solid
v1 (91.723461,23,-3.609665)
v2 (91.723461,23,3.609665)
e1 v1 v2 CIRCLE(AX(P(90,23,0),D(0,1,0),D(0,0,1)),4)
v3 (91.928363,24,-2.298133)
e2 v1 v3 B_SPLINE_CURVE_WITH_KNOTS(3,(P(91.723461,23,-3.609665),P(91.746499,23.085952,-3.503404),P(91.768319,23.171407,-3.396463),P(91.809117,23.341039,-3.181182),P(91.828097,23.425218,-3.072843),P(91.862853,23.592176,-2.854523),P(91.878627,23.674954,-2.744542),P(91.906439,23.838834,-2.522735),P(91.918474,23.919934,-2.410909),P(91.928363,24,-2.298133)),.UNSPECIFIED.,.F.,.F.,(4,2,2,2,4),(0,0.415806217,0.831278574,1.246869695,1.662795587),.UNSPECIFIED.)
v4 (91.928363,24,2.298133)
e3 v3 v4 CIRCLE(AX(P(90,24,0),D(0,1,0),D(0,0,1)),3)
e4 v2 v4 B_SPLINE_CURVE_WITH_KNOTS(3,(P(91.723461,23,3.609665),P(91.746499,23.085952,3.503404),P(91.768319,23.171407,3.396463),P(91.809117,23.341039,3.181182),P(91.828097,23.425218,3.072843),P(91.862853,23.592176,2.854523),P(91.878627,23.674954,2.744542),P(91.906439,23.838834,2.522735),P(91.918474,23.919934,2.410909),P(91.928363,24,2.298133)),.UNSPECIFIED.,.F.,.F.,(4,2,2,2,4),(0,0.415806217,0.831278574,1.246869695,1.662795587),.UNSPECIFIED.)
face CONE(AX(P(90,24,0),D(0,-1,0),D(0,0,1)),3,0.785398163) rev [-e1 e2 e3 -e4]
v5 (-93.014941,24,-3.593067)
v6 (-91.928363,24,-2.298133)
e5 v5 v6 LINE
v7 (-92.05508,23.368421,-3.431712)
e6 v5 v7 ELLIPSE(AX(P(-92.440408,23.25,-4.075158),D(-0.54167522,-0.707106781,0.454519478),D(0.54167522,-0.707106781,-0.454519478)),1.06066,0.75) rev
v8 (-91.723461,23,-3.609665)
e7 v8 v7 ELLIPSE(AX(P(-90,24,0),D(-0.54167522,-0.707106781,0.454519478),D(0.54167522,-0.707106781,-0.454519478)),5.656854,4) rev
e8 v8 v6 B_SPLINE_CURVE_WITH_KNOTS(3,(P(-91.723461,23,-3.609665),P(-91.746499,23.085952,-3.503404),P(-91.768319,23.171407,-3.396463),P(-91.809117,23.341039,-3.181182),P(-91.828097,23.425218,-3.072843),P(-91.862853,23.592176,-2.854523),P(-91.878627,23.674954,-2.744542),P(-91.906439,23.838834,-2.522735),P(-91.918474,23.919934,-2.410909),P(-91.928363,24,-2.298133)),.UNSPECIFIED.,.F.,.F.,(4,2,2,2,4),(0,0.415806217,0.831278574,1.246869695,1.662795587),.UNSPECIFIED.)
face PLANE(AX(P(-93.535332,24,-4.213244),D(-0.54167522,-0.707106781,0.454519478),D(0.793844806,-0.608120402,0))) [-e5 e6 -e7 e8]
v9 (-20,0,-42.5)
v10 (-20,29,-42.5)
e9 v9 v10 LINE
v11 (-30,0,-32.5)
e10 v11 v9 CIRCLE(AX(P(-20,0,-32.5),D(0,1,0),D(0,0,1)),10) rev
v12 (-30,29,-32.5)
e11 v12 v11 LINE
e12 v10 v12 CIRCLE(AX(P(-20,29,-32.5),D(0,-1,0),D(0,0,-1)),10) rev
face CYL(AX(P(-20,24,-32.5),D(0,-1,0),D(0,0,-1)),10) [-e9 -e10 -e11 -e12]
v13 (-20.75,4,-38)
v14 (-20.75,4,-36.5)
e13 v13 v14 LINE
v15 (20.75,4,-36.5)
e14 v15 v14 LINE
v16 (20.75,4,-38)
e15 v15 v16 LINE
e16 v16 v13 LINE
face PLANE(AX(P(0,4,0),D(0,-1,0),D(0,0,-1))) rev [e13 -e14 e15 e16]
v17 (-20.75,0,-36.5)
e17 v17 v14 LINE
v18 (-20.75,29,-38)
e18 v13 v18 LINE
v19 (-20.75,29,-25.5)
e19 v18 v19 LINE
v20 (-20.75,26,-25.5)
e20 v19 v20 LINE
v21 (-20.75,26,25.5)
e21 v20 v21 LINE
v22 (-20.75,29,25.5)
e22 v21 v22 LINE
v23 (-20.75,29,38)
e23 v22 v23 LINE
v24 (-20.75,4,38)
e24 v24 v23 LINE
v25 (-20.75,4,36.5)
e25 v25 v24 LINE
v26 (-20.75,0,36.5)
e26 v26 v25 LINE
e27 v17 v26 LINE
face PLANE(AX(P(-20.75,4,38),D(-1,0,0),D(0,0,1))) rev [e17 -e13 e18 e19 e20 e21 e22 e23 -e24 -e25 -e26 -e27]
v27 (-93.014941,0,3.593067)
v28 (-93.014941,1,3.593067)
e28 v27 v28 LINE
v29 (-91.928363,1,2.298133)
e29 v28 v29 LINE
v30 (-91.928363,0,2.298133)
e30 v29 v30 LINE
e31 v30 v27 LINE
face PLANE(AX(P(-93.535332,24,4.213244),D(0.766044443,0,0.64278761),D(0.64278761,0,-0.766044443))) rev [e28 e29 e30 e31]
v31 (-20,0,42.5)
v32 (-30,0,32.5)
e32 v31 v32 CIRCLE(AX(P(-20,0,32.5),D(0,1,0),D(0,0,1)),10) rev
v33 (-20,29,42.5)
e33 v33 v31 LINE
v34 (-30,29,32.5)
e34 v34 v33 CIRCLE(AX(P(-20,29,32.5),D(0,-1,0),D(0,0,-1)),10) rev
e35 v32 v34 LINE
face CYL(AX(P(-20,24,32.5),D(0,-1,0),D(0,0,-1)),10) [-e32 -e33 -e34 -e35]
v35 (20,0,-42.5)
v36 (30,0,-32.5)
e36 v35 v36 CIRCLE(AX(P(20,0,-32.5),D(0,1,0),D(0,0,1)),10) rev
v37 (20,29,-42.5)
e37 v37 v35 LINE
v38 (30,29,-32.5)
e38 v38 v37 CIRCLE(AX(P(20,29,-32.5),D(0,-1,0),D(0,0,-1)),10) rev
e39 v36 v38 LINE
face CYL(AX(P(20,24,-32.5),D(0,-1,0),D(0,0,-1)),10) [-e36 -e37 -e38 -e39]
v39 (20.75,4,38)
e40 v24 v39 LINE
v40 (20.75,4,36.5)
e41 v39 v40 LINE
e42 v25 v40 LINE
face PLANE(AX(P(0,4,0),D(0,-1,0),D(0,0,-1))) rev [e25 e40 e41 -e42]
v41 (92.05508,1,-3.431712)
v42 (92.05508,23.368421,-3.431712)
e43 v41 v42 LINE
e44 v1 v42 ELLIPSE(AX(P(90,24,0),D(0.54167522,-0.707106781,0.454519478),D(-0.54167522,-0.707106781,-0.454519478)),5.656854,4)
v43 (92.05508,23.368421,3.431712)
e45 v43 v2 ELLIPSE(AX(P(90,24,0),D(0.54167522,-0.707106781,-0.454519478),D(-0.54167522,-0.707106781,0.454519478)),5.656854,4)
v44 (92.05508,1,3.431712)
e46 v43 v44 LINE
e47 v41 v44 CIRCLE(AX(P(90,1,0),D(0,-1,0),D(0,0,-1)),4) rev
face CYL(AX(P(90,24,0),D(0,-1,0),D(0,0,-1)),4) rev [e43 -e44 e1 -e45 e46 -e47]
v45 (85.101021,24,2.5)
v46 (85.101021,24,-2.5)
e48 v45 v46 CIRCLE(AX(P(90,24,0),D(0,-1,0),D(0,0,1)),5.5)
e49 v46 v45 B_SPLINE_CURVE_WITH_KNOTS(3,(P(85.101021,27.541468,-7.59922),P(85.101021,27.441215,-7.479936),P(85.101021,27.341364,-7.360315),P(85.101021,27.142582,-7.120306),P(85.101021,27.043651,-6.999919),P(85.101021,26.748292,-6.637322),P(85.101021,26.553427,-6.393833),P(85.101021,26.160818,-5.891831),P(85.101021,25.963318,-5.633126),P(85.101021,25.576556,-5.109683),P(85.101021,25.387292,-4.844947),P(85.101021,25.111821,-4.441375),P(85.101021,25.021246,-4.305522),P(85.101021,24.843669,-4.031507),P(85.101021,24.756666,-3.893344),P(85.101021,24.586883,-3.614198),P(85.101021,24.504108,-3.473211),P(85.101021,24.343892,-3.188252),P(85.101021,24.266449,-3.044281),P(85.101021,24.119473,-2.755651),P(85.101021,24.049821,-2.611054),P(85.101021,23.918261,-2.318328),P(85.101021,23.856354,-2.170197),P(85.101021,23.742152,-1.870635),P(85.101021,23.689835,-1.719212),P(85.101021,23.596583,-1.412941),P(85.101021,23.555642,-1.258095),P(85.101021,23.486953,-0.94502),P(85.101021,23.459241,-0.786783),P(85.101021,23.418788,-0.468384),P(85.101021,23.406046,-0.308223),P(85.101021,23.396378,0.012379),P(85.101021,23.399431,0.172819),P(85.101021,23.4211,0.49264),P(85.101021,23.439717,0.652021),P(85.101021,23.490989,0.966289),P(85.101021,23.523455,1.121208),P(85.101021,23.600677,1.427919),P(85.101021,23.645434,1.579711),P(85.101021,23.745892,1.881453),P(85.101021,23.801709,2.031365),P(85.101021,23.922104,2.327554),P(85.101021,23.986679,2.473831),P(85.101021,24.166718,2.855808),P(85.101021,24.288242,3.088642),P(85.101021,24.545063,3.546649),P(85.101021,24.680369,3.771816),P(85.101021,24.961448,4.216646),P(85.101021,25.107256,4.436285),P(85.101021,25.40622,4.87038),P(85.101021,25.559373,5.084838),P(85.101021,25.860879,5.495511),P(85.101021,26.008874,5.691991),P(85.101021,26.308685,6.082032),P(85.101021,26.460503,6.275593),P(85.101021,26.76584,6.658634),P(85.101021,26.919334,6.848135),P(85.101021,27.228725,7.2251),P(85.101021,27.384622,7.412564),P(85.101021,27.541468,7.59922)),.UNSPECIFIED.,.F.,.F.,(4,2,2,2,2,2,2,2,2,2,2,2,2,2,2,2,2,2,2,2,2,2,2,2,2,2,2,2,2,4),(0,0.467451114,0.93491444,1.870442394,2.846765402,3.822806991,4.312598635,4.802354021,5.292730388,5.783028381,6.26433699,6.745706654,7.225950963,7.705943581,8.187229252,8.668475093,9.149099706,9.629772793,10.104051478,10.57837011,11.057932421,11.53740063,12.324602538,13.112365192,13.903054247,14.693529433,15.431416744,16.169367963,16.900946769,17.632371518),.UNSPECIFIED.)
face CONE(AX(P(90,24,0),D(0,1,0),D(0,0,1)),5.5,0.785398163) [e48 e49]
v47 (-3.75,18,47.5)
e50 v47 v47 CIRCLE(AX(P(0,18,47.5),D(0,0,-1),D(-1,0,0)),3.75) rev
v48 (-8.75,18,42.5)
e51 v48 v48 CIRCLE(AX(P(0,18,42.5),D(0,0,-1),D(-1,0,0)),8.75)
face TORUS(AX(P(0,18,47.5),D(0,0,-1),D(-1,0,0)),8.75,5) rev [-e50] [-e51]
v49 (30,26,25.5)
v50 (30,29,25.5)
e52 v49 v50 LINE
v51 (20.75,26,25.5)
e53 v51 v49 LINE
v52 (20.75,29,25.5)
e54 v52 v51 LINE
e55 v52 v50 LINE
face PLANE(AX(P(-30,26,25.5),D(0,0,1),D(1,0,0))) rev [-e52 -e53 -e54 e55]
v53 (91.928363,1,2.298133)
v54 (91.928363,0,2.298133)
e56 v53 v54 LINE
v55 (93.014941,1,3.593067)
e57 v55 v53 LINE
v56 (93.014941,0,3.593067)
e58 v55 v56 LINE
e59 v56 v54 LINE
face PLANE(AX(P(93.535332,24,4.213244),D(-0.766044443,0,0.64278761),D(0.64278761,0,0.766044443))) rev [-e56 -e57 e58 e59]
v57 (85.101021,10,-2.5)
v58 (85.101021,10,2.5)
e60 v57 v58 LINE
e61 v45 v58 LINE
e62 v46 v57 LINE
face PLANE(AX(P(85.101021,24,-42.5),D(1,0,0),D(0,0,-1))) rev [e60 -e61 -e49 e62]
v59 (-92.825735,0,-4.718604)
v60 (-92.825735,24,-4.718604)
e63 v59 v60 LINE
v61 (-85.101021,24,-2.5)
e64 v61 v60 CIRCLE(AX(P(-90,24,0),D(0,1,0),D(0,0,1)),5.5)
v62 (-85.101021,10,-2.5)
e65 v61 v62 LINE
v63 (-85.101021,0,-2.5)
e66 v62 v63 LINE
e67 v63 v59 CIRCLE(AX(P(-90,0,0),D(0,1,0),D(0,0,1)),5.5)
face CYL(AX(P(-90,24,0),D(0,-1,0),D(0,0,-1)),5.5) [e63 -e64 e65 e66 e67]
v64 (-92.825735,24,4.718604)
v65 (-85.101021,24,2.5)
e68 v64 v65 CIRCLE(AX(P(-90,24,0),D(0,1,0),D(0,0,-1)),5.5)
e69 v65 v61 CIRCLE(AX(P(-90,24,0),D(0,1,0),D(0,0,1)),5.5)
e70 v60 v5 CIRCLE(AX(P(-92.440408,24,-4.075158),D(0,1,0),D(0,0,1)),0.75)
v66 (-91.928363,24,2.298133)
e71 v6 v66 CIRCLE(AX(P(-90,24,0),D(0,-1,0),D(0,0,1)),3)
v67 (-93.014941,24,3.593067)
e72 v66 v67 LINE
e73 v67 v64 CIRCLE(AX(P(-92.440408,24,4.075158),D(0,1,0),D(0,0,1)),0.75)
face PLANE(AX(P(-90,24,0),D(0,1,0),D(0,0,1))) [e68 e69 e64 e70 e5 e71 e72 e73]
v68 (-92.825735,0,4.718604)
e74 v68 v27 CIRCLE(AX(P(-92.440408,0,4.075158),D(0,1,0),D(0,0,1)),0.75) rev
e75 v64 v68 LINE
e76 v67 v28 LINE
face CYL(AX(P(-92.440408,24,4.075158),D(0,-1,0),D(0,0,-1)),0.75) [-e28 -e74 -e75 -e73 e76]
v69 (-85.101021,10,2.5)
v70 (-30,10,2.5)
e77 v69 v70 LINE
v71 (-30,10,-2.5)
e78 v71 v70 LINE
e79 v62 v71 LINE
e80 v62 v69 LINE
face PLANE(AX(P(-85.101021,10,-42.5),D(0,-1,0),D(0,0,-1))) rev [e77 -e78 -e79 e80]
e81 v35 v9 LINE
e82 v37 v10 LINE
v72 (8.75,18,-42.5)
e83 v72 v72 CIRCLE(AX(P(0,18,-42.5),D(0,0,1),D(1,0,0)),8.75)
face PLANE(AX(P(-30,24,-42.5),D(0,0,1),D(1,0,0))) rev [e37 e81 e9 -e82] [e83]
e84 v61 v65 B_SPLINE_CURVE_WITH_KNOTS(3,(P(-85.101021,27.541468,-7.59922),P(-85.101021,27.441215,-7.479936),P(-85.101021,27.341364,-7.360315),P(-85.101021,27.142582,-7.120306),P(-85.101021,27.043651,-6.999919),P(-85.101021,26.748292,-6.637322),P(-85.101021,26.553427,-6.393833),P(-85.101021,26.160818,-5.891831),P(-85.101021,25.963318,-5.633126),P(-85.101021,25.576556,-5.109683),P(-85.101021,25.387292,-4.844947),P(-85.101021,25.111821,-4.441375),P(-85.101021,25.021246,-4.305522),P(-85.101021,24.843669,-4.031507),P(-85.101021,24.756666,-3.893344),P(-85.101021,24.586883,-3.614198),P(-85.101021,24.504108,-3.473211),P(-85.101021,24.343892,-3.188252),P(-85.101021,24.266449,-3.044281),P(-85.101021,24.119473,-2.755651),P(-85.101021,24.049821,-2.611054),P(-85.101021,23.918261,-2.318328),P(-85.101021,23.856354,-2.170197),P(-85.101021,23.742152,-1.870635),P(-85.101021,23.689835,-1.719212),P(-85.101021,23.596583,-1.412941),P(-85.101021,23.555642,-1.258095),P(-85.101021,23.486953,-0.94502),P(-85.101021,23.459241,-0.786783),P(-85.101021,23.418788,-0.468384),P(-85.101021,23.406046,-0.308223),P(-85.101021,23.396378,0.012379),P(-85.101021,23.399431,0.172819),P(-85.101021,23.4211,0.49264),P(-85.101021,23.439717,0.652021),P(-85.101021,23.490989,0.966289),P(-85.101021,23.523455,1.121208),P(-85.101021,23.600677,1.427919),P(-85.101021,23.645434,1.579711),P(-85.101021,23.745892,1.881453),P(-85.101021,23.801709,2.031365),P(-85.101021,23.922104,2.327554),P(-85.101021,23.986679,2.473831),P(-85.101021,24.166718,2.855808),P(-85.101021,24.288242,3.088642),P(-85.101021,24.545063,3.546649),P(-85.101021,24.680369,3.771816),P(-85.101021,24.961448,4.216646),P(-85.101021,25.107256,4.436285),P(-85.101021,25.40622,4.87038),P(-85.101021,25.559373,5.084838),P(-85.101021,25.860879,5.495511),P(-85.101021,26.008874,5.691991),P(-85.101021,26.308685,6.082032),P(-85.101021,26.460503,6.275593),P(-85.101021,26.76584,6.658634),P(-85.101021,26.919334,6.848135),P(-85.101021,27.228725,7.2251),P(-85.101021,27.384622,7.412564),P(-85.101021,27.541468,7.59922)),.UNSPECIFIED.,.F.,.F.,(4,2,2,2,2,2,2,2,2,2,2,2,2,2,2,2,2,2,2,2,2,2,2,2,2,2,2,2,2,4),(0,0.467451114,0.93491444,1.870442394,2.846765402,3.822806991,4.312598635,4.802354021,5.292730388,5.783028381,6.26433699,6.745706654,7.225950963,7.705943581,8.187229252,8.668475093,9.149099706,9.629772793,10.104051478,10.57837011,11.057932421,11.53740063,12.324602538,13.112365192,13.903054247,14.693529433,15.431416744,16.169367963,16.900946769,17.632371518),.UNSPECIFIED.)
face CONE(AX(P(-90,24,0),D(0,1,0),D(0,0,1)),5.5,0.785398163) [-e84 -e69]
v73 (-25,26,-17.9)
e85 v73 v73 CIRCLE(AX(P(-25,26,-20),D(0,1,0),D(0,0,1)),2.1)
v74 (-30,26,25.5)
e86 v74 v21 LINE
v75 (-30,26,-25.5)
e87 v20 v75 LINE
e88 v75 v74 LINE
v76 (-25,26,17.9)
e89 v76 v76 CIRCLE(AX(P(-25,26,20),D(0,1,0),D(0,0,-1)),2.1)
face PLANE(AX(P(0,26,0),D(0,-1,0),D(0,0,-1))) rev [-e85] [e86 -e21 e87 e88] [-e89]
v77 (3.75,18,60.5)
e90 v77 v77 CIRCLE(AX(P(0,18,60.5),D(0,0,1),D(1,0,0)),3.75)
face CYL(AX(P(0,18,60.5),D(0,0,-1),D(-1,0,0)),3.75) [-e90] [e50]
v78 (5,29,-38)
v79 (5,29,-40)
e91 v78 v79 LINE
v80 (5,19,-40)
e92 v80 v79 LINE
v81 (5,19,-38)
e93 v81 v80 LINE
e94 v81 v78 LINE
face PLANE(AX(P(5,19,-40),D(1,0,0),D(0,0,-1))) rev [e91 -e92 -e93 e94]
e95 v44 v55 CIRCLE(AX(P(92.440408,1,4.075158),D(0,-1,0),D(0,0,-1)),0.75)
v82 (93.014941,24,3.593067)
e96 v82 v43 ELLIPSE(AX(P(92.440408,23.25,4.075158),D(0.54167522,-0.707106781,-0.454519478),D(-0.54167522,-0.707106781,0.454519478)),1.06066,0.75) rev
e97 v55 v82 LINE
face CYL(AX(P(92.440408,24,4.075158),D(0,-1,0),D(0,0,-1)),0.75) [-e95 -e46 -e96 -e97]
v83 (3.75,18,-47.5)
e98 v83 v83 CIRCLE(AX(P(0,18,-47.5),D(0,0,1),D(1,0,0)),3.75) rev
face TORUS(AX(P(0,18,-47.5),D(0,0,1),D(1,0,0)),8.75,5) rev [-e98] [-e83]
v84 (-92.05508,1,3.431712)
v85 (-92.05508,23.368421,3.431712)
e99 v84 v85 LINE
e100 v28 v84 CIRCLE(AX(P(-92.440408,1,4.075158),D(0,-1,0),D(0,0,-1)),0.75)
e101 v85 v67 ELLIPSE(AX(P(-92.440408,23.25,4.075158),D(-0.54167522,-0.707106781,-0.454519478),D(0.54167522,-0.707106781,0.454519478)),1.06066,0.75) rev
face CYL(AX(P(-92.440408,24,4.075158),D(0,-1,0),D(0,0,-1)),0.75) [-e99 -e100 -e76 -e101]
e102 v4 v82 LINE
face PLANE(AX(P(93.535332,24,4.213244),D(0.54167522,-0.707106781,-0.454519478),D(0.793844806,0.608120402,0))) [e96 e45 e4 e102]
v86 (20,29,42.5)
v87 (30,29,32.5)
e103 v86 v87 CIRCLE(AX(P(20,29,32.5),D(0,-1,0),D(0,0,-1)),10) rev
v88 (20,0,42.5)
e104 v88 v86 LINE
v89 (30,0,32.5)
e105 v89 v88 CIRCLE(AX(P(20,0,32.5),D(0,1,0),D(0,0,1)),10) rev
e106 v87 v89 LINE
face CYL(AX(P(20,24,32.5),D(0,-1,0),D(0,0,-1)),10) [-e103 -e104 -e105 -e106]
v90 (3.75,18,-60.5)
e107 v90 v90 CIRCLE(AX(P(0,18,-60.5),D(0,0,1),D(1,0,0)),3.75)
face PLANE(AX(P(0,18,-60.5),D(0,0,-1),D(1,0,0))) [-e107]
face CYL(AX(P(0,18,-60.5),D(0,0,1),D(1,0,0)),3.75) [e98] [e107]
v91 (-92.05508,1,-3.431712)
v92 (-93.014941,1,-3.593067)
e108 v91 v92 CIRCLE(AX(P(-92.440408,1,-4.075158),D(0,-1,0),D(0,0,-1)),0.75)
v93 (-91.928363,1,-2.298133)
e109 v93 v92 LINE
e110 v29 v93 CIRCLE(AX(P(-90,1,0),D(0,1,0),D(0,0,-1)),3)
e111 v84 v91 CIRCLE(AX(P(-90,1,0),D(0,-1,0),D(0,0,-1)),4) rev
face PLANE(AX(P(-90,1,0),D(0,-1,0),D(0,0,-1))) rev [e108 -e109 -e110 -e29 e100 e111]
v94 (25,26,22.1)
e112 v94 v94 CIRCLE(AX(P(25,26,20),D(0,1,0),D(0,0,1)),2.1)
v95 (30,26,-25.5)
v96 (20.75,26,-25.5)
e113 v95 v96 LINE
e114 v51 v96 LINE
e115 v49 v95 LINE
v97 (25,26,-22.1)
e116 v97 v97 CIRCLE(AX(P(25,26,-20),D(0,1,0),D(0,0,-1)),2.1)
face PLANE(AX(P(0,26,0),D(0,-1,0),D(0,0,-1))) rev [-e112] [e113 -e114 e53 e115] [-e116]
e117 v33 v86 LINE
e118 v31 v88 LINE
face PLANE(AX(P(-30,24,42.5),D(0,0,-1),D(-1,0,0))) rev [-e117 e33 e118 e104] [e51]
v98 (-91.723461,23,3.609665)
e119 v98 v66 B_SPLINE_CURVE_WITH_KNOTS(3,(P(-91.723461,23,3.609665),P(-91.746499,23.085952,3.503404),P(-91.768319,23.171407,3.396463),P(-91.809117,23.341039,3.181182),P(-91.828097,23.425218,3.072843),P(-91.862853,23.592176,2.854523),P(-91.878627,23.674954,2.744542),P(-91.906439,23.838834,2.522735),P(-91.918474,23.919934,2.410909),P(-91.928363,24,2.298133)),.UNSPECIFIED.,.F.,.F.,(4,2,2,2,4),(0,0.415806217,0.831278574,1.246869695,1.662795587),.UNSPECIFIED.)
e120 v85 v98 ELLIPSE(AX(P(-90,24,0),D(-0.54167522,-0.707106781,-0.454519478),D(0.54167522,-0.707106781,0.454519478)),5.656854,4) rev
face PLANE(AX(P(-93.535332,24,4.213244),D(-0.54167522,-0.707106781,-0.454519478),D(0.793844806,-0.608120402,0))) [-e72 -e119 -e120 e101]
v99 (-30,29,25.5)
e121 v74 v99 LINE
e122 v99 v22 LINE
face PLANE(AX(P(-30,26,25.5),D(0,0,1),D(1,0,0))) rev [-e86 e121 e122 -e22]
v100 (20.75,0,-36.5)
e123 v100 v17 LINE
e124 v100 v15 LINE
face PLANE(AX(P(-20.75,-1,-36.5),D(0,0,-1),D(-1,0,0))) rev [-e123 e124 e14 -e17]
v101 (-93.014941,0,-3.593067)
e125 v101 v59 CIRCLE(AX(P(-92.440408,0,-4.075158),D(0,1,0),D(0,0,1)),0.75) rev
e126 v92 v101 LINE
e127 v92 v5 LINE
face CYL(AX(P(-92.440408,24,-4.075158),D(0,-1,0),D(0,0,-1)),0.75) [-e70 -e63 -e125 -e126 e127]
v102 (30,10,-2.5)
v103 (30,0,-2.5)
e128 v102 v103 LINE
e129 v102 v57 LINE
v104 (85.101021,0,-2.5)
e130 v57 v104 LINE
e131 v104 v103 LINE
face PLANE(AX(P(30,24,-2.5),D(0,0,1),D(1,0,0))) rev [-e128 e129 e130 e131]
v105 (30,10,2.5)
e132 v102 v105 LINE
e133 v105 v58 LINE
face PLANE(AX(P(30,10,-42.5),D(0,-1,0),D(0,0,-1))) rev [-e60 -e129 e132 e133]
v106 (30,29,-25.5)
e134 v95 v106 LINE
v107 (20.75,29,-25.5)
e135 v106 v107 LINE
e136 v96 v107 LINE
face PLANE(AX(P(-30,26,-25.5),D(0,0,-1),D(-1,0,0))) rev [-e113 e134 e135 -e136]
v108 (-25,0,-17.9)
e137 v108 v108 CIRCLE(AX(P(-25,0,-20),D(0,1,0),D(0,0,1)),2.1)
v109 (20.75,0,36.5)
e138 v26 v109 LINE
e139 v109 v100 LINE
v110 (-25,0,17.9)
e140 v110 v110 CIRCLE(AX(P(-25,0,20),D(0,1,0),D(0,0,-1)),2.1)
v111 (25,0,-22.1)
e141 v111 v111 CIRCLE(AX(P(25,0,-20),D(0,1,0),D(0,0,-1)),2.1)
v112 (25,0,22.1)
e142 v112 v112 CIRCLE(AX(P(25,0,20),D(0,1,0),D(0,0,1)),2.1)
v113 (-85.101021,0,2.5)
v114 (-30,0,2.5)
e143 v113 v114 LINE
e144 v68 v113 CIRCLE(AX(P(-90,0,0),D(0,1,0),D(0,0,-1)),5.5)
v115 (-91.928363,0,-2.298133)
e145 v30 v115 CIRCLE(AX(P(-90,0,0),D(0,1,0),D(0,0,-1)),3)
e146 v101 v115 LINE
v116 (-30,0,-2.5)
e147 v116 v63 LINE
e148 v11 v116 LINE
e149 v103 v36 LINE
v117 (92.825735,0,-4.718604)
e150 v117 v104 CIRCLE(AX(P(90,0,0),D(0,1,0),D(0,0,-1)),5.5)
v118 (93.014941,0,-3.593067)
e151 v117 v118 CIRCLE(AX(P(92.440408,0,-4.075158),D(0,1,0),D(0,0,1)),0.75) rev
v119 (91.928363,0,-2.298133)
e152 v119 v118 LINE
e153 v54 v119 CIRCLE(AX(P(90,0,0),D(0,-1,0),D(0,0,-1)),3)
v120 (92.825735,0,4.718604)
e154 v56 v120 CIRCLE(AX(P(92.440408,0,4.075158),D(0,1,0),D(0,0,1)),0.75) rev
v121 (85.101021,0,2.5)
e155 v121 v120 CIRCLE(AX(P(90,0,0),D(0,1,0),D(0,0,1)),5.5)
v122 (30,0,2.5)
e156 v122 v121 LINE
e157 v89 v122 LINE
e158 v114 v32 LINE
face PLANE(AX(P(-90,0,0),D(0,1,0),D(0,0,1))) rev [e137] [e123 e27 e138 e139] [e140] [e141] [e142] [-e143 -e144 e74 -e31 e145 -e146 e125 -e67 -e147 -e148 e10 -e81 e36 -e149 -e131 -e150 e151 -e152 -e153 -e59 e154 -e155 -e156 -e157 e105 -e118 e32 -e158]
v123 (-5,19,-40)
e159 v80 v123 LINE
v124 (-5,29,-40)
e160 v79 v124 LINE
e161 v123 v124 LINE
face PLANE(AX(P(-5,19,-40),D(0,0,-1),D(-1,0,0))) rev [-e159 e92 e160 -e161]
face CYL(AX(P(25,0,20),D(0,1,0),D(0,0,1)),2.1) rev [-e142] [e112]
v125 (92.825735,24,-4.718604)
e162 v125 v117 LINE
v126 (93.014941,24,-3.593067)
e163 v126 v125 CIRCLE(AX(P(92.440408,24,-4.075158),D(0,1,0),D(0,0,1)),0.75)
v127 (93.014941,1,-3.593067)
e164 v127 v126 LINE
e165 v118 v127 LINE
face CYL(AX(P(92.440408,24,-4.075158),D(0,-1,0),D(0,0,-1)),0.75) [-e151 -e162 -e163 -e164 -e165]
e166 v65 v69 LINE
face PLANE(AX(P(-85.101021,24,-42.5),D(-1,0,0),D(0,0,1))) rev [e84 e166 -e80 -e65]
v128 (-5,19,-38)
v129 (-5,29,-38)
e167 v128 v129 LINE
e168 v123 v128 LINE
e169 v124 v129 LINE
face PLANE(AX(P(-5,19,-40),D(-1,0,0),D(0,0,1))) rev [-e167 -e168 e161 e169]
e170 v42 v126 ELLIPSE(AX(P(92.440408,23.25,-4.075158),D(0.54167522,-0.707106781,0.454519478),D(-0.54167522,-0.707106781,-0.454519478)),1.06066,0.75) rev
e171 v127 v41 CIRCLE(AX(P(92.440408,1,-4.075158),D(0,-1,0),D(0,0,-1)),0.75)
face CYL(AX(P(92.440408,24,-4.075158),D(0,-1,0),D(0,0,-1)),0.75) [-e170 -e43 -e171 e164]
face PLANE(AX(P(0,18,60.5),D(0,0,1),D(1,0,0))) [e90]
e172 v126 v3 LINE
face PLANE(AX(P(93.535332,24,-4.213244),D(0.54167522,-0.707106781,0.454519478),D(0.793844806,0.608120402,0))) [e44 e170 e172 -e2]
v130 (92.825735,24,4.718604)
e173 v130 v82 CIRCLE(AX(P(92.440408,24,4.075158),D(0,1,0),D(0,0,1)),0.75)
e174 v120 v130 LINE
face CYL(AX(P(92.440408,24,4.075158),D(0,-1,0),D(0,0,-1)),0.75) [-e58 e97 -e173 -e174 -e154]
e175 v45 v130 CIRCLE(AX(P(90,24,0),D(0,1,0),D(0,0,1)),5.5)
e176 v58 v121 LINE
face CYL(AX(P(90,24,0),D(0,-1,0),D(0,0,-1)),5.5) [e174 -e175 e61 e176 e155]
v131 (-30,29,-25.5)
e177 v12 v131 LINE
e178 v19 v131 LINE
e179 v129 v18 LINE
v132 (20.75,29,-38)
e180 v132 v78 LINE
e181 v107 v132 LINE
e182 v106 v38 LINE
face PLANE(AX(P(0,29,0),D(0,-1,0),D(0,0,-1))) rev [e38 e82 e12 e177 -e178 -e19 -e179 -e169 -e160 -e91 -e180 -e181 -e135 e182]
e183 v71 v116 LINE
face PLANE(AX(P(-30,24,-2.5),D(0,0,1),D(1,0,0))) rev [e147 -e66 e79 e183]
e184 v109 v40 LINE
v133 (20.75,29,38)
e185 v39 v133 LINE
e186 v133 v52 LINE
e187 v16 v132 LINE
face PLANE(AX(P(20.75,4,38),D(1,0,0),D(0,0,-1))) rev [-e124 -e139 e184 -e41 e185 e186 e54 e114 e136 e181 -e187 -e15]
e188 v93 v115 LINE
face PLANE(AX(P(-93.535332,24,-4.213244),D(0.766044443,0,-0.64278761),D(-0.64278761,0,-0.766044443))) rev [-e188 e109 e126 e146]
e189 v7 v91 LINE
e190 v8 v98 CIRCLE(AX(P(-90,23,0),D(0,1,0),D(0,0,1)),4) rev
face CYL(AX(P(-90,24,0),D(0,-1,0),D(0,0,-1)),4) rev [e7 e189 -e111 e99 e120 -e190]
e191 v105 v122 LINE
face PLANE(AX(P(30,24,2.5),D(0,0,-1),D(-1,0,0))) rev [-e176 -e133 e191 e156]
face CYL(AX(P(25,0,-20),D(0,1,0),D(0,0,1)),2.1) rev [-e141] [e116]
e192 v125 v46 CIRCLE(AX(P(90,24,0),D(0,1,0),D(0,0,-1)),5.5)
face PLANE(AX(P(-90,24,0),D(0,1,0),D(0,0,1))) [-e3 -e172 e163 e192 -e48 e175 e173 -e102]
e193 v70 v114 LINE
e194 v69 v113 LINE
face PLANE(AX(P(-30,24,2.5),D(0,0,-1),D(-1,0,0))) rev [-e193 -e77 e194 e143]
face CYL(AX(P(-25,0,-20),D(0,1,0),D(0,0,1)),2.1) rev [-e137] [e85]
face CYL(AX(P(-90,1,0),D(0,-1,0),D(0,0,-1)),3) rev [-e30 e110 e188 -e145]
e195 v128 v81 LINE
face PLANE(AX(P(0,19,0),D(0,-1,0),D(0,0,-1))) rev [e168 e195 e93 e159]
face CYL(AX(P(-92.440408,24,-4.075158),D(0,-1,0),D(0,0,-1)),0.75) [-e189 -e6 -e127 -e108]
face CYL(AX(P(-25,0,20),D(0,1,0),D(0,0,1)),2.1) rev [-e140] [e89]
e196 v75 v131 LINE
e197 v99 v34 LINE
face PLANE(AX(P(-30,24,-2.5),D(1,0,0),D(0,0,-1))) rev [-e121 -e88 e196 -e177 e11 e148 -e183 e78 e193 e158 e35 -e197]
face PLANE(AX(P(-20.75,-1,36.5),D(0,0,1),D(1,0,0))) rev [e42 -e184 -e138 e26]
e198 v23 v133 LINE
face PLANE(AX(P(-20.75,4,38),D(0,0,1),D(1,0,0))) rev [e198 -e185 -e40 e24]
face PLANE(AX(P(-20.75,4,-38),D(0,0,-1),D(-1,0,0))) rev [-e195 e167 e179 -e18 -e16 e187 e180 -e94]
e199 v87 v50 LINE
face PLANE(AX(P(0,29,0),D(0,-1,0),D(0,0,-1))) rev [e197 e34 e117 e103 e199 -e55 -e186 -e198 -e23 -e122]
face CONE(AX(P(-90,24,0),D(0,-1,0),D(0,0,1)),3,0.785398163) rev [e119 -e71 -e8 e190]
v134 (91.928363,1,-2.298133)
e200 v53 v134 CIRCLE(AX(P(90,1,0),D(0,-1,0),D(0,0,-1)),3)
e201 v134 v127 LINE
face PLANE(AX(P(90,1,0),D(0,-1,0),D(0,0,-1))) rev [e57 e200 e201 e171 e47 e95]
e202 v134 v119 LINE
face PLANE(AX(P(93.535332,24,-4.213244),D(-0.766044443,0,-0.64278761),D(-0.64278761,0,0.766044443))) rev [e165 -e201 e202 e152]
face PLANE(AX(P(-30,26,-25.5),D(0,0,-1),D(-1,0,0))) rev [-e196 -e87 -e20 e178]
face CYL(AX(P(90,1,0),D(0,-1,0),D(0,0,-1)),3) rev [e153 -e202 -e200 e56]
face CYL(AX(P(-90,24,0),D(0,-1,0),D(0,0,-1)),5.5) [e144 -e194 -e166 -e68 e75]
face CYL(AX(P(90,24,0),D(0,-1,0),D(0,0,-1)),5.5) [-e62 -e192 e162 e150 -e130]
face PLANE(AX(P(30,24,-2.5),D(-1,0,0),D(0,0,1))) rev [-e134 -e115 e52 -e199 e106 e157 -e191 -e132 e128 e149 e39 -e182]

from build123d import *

# Parameters (mm, degrees)
BOSS_EXTRUDE1_DEPTH  = 24
SKETCH22_W           = 60.00000000000001
SKETCH22_H           = 85
BOSS_EXTRUDE6_DEPTH  = 5
SKETCH5_W            = 41.5
SKETCH5_H            = 76
CUT_EXTRUDE1_DEPTH   = 25
SKETCH17_W           = 60
SKETCH17_H           = 51
CUT_EXTRUDE10_DEPTH  = 3
SKETCH8_W            = 55.101020514433614
SKETCH8_H            = 14
CUT_EXTRUDE3_DEPTH   = 108.77225201740228
FILLET4_R            = 10
BOSS_EXTRUDE3_DEPTH  = 1
BOSS_EXTRUDE3_DRAFT  = -45.0000000000001
MIRROR6_COPY_1_DEPTH = 1
MIRROR6_COPY_1_DRAFT = -45.0000000000001
BOSS_EXTRUDE4_DEPTH  = 1
FILLET3_R            = 0.75
SKETCH15_R           = 2.100000000000001
CUT_EXTRUDE8_DEPTH   = 106.67266341818518
SKETCH20_W           = 41.499999999999986
SKETCH20_H           = 72.99999999999999
CUT_EXTRUDE11_DEPTH  = 5
SKETCH21_R           = 3.75
BOSS_EXTRUDE5_DEPTH  = 18
FILLET5_R            = 5
SKETCH24_W           = 10
SKETCH24_H           = 2
CUT_EXTRUDE12_DEPTH  = 10


with BuildPart() as part:
    # Sketch4 → Boss-Extrude1 (new body)
    with BuildSketch(Plane(origin=(0, 0, 0), x_dir=(1, 0, 0), z_dir=(0, 1, 0))):
        with BuildLine():
            Line((-30, 2.499999999999996), (-30, 42.5))
            Line((-30, 42.5), (30, 42.5))
            Line((30, 42.5), (30, 2.499999999999996))
            Line((30, 2.499999999999996), (85.10102051443361, 2.49999999999999))
            ThreePointArc((85.10102051443361, 2.49999999999999), (88.90515510613471, 5.389927147780134), (93.53533185327602, 4.213244437154374))
            Line((93.53533185327602, 4.213244437154374), (92.57115043874622, 3.064177772475905))
            ThreePointArc((92.57115043874622, 3.064177772475905), (86, -2.572e-14), (92.57115043874622, -3.0641777724758823))
            Line((92.57115043874622, -3.0641777724758823), (93.53533185327602, -4.213244437154351))
            ThreePointArc((93.53533185327602, -4.213244437154351), (88.90515510613471, -5.389927147780135), (85.10102051443361, -2.499999999999969))
            Line((85.10102051443361, -2.499999999999969), (30, -2.4999999999999893))
            Line((30, -2.4999999999999893), (30.00000000000001, -42.499999999999986))
            Line((30.00000000000001, -42.499999999999986), (-30.00000000000001, -42.499999999999986))
            Line((-30.00000000000001, -42.499999999999986), (-30, -2.4999999999999893))
            Line((-30, -2.4999999999999893), (-85.10102051443361, -2.499999999999969))
            ThreePointArc((-85.10102051443361, -2.499999999999969), (-88.90515510613471, -5.389927147780135), (-93.53533185327602, -4.213244437154351))
            Line((-93.53533185327602, -4.213244437154351), (-92.57115043874622, -3.0641777724758823))
            ThreePointArc((-92.57115043874622, -3.0641777724758823), (-86, -2.523e-14), (-92.57115043874622, 3.064177772475905))
            Line((-92.57115043874622, 3.064177772475905), (-93.53533185327602, 4.213244437154374))
            ThreePointArc((-93.53533185327602, 4.213244437154374), (-88.90515510613471, 5.389927147780134), (-85.10102051443361, 2.49999999999999))
            Line((-85.10102051443361, 2.49999999999999), (-30, 2.499999999999996))
        make_face()
    extrude(amount=BOSS_EXTRUDE1_DEPTH)

    # Sketch22 → Boss-Extrude6 (add)
    with BuildSketch(Plane(origin=(0, 24, 0), x_dir=(1, 0, 0), z_dir=(0, 1, 0))):
        Rectangle(SKETCH22_W, SKETCH22_H)
    extrude(amount=BOSS_EXTRUDE6_DEPTH)

    # Sketch5 → Cut-Extrude1 (cut)
    with BuildSketch(Plane(origin=(0, 29, 0), x_dir=(1, 0, 0), z_dir=(0, 1, 0))):
        Rectangle(SKETCH5_W, SKETCH5_H)
    extrude(amount=-CUT_EXTRUDE1_DEPTH, mode=Mode.SUBTRACT)

    # Sketch17 → Cut-Extrude10 (cut)
    with BuildSketch(Plane(origin=(0, 29, 0), x_dir=(1, 0, 0), z_dir=(0, 1, 0))):
        Rectangle(SKETCH17_W, SKETCH17_H)
    extrude(amount=-CUT_EXTRUDE10_DEPTH, mode=Mode.SUBTRACT)

    # Sketch8 → Cut-Extrude3 (cut, through all)
    with BuildSketch(Plane.XY.offset(2.5000000000000004)):
        with Locations((-57.55051025721681, 17)):
            Rectangle(SKETCH8_W, SKETCH8_H)
        with Locations((57.55051025721681, 17)):
            Rectangle(SKETCH8_W, SKETCH8_H)
    extrude(amount=-CUT_EXTRUDE3_DEPTH, mode=Mode.SUBTRACT)

    # Fillet4
    fillet4_edges = [part.edges().sort_by_distance(p)[0] for p in [
        (-30, 14.5, -42.5),
        (30, 14.5, -42.5),
        (30.000000000000007, 14.5, 42.49999999999999),
        (-30.000000000000007, 14.5, 42.49999999999999),
    ]]
    fillet(fillet4_edges, radius=FILLET4_R)


with BuildPart() as boss_extrude3_tool:
    # Sketch11 → Boss-Extrude3 (with draft: the straight prism first)
    with BuildSketch(Plane(origin=(0, 24, 0), x_dir=(1, 0, 0), z_dir=(0, 1, 0))):
        with BuildLine():
            Line((-93.535331853276, 4.21324443715433), (-91.92836282905964, 2.2981333293569084))
            ThreePointArc((-91.92836282905964, 2.2981333293569084), (-87.00000000000001, -1.768e-14), (-91.92836282905964, -2.2981333293569084))
            Line((-91.92836282905964, -2.2981333293569084), (-93.535331853276, -4.21324443715433))
            ThreePointArc((-93.535331853276, -4.21324443715433), (-84.50000000000001, -1.835e-14), (-93.535331853276, 4.21324443715433))
        make_face()
    extrude(amount=-BOSS_EXTRUDE3_DEPTH)
    # Boss-Extrude3: the draft: its side faces are tilted about the plane it starts from
    boss_extrude3_sides = [boss_extrude3_tool.faces().sort_by_distance(p)[0] for p in [
        (-92.731847341, 23.5, -3.255688883),
        (-87, 23.5, 0),
        (-92.731847341, 23.5, 3.255688883),
        (-84.5, 23.5, 0),
    ]]
    draft(boss_extrude3_sides, Plane(origin=(0, 24, 0), x_dir=(1, 0, 0), z_dir=(0, 1, 0)), BOSS_EXTRUDE3_DRAFT)


with BuildPart() as part_1:
    add(part.part)

    # Boss-Extrude3: add boss_extrude3_tool
    add(boss_extrude3_tool.part)


with BuildPart() as mirror6_copy_1_tool:
    # Mirror6 copy 1 sketch → Mirror6 copy 1 (with draft: the straight prism first)
    with BuildSketch(Plane(origin=(0, 24, 0), x_dir=(-1, 0, 0), z_dir=(0, 1, 0))):
        with BuildLine():
            Line((-93.535331853276, -4.21324443715433), (-91.92836282905964, -2.2981333293569084))
            ThreePointArc((-91.92836282905964, -2.2981333293569084), (-87.00000000000001, 1.768e-14), (-91.92836282905964, 2.2981333293569084))
            Line((-91.92836282905964, 2.2981333293569084), (-93.535331853276, 4.21324443715433))
            ThreePointArc((-93.535331853276, 4.21324443715433), (-84.50000000000001, 1.835e-14), (-93.535331853276, -4.21324443715433))
        make_face()
    extrude(amount=-MIRROR6_COPY_1_DEPTH)
    # Mirror6 copy 1: the draft: its side faces are tilted about the plane it starts from
    mirror6_copy_1_sides = [mirror6_copy_1_tool.faces().sort_by_distance(p)[0] for p in [
        (92.731847341, 23.5, -3.255688883),
        (87, 23.5, 0),
        (92.731847341, 23.5, 3.255688883),
        (84.5, 23.5, 0),
    ]]
    draft(mirror6_copy_1_sides, Plane(origin=(0, 24, 0), x_dir=(-1, 0, 0), z_dir=(0, 1, 0)), MIRROR6_COPY_1_DRAFT)


with BuildPart() as part_2:
    add(part_1.part)

    # Mirror6 copy 1: add mirror6_copy_1_tool
    add(mirror6_copy_1_tool.part)

    # Sketch12 → Boss-Extrude4 (add)
    with BuildSketch(Plane.XZ):
        with BuildLine():
            Line((-93.53533185327602, 4.213244437154351), (-91.92836282905965, 2.2981333293569315))
            ThreePointArc((-91.92836282905965, 2.2981333293569315), (-87, 1.768e-14), (-91.92836282905964, -2.298133329356913))
            Line((-91.92836282905964, -2.298133329356913), (-93.53533185327602, -4.213244437154374))
            ThreePointArc((-93.53533185327602, -4.213244437154374), (-84.49999999999996, 2.568e-14), (-93.53533185327602, 4.213244437154351))
        make_face()
    boss_extrude4 = extrude(amount=-BOSS_EXTRUDE4_DEPTH)

    # Mirror5: Boss-Extrude4 across plane
    add(boss_extrude4.mirror(Plane(origin=(0, 0, 0), x_dir=(0, 0, 1), z_dir=(1, 0, 0))))

    # Fillet3
    fillet3_edges = [part_2.edges().sort_by_distance(p)[0] for p in [
        (93.535331853276, 12, 4.213244437154348),
        (92.57115043874622, 12.5, 3.064177772475879),
        (92.57115043874622, 12.5, -3.064177772475902),
        (93.535331853276, 12, -4.213244437154364),
        (-93.535331853276, 12, 4.213244437154348),
        (-92.57115043874622, 12.5, 3.064177772475879),
        (-93.535331853276, 12, -4.213244437154364),
        (-92.57115043874622, 12.5, -3.064177772475902),
    ]]
    fillet(fillet3_edges, radius=FILLET3_R - 0.0001)  # a hair under: the kernel refuses the full size

    # Sketch15 → Cut-Extrude8 (cut, through all)
    with BuildSketch(Plane(origin=(0, 26.000000000000004, 0), x_dir=(1, 0, 0), z_dir=(0, 1, 0))):
        with Locations(Location((-25, 20.000000000000004, 0), (0, 0, 270))):
            Circle(SKETCH15_R)
        with Locations(Location((25, 20.000000000000004, 0), (0, 0, 90))):
            Circle(SKETCH15_R)
        with Locations(Location((25, -20.000000000000004, 0), (0, 0, 270))):
            Circle(SKETCH15_R)
        with Locations(Location((-25, -20.000000000000004, 0), (0, 0, 90))):
            Circle(SKETCH15_R)
    extrude(amount=-CUT_EXTRUDE8_DEPTH, mode=Mode.SUBTRACT)

    # Sketch20 → Cut-Extrude11 (cut)
    with BuildSketch(Plane(origin=(0, 4, 0), x_dir=(1, 0, 0), z_dir=(0, 1, 0))):
        Rectangle(SKETCH20_W, SKETCH20_H)
    extrude(amount=-CUT_EXTRUDE11_DEPTH, mode=Mode.SUBTRACT)

    # Sketch21 → Boss-Extrude5 (add)
    with BuildSketch(Plane.XY.offset(42.499999999999986)):
        with Locations(Location((0, 18, 0), (0, 0, 180))):
            Circle(SKETCH21_R)
    boss_extrude5 = extrude(amount=BOSS_EXTRUDE5_DEPTH)

    # Mirror9: Boss-Extrude5 across plane
    add(boss_extrude5.mirror(Plane.XY))

    # Fillet5
    fillet5_edges = [part_2.edges().sort_by_distance(p)[0] for p in [
        (3.75, 17.999999999999996, 42.499999999999986),
        (3.75, 17.999999999999996, -42.499999999999986),
    ]]
    fillet(fillet5_edges, radius=FILLET5_R)

    # Sketch24 → Cut-Extrude12 (cut)
    with BuildSketch(Plane(origin=(0, 29, 0), x_dir=(1, 0, 0), z_dir=(0, 1, 0))):
        with Locations((0, 38.999999999999986)):
            Rectangle(SKETCH24_W, SKETCH24_H)
    extrude(amount=-CUT_EXTRUDE12_DEPTH, mode=Mode.SUBTRACT)


solid = part_2.part
